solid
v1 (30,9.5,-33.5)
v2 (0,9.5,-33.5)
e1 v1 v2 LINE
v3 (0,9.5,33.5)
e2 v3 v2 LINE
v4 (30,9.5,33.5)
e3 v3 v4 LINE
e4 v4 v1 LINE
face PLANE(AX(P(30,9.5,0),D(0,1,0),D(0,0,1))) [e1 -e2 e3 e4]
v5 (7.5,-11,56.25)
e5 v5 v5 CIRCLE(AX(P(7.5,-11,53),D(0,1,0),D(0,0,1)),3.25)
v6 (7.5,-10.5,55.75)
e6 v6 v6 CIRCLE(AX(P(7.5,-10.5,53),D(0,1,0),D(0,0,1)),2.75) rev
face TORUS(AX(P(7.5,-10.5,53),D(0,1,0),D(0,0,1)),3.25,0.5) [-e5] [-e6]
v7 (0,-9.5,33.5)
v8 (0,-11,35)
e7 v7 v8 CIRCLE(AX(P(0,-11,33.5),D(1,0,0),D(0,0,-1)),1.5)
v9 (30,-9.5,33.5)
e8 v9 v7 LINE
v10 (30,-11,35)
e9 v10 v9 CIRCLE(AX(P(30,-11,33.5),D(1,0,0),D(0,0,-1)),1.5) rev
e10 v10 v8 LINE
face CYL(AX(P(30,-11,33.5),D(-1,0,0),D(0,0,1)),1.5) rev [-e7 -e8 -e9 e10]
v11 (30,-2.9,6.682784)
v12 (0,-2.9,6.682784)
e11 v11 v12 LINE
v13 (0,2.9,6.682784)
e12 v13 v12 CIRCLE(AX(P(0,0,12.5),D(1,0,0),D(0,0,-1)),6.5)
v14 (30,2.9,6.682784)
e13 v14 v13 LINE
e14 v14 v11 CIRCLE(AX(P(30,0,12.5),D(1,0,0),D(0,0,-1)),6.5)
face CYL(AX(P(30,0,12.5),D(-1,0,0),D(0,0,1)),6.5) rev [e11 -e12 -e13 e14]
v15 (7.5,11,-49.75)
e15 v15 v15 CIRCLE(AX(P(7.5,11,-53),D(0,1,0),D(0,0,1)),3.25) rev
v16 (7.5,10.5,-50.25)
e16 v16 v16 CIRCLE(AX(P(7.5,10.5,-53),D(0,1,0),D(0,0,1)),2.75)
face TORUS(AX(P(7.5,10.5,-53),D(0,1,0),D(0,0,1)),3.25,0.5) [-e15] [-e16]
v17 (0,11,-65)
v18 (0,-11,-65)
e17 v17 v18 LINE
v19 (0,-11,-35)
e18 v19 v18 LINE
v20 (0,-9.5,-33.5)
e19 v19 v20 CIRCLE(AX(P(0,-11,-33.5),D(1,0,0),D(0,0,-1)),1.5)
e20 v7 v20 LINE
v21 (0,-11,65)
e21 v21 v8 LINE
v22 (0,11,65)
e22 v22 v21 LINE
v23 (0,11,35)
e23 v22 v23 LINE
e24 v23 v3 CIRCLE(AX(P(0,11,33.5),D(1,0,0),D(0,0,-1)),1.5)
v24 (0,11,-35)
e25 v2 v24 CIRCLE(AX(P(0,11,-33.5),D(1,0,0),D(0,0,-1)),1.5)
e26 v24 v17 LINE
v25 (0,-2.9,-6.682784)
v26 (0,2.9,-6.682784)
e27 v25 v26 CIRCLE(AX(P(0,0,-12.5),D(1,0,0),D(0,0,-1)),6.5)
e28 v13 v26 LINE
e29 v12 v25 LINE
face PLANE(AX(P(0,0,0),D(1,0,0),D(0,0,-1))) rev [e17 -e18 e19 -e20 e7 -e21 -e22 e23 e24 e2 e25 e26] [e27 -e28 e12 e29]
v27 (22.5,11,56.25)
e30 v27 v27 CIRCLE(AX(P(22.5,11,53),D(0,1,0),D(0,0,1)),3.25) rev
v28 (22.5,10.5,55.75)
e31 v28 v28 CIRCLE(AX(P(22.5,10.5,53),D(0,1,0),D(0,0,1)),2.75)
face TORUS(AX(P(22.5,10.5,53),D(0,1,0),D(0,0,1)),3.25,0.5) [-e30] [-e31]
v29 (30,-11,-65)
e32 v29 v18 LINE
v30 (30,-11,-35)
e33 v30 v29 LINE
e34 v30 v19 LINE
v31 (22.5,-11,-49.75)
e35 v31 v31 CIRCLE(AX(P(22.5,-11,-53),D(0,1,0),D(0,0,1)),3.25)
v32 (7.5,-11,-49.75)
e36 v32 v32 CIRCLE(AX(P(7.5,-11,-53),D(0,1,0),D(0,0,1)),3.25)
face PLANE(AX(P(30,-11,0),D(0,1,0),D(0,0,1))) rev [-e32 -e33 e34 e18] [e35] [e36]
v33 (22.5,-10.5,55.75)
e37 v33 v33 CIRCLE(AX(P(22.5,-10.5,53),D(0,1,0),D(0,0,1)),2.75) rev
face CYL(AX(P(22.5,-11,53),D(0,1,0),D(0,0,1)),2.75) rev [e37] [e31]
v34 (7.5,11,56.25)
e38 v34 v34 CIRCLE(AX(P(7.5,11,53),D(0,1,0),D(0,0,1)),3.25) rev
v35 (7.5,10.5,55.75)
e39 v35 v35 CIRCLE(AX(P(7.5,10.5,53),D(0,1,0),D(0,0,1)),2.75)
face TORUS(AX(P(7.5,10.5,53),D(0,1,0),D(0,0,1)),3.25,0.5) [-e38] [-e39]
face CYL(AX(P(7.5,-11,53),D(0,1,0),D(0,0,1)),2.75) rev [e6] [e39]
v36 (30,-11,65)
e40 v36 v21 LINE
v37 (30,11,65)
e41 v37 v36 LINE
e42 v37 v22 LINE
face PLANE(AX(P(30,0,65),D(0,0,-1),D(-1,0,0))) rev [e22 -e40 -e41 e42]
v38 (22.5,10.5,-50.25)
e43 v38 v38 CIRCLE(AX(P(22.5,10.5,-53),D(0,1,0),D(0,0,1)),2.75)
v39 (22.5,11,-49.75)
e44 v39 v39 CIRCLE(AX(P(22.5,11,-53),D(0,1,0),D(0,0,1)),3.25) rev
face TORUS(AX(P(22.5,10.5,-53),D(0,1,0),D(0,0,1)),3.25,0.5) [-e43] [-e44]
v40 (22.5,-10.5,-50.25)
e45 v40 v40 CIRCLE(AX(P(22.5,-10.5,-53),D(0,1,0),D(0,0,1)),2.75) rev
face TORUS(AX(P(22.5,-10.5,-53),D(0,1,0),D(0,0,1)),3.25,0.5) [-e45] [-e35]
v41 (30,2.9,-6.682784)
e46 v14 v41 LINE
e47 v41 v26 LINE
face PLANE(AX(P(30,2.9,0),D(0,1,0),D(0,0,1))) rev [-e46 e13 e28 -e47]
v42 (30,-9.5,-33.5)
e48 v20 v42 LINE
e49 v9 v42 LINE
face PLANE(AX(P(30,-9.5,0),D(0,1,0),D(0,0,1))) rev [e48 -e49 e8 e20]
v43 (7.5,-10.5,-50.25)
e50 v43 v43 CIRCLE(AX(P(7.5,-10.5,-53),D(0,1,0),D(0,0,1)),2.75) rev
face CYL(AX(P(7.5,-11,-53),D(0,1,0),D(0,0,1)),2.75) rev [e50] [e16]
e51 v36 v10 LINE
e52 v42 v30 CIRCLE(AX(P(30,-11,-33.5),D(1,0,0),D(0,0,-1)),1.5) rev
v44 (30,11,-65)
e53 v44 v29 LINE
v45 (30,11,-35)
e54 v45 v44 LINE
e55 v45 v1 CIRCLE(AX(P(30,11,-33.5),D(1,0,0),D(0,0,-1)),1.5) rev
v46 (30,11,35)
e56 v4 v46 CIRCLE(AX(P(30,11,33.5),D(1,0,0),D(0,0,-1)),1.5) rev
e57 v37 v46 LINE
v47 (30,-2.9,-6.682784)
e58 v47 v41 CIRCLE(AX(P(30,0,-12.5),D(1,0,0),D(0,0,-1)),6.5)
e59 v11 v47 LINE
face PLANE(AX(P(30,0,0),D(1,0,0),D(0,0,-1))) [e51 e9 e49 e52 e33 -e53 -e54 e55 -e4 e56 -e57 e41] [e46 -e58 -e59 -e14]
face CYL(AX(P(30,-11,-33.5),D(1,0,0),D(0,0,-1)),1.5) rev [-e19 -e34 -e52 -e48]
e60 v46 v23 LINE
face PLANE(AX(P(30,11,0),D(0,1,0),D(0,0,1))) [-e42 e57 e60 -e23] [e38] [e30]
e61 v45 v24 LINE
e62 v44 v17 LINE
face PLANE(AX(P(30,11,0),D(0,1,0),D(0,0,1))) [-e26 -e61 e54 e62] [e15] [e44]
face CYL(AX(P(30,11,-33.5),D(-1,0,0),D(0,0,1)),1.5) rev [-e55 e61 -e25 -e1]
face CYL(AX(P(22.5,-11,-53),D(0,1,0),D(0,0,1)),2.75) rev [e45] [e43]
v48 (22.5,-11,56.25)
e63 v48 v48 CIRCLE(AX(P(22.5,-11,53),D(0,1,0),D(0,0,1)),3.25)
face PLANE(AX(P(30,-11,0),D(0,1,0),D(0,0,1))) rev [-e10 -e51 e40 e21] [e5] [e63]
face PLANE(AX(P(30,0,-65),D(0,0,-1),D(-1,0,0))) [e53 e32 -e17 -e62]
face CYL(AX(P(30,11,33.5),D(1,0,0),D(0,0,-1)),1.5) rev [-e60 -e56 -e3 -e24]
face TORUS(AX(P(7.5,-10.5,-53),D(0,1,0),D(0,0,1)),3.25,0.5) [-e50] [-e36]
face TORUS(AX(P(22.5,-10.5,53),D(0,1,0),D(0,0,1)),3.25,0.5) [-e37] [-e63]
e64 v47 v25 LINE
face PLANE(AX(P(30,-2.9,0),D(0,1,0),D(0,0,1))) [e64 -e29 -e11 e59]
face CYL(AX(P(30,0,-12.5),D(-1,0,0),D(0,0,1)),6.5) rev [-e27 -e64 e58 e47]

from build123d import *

# Parameters (mm, degrees)
BOSS_EXTRUDE1_DEPTH     = 30
FILLET1_R               = 1.5
SKETCH2_R               = 2.75
CUT_EXTRUDE1_DEPTH      = 75.893257373
MIRROR2_COPY_1_SKETCH_R = 2.75
MIRROR2_COPY_1_DEPTH    = 75.893257373
FILLET2_R               = 0.5


with BuildPart() as part:
    # Sketch1 → Boss-Extrude1 (new body)
    with BuildSketch(Plane(origin=(0, 0, 0), x_dir=(0, 0, -1), z_dir=(1, 0, 0))):
        Polygon((-35, 11), (-65, 11), (-65, -11), (-35, -11), (-35, -9.5), (35, -9.5), (35, -11), (65, -11), (65, 11), (35, 11), (35, 9.5), (-35, 9.5), align=None)
        with BuildLine():
            Line((-6.682784171, 2.9), (6.682784171, 2.9))
            ThreePointArc((6.682784171, 2.9), (19, 0), (6.682784171, -2.9))
            Line((6.682784171, -2.9), (-6.682784171, -2.9))
            ThreePointArc((-6.682784171, -2.9), (-19, 0), (-6.682784171, 2.9))
        make_face(mode=Mode.SUBTRACT)
    extrude(amount=BOSS_EXTRUDE1_DEPTH)

    # Fillet1
    fillet1_edges = [part.edges().sort_by_distance(p)[0] for p in [
        (15, -9.5, 35),
        (15, -9.5, -35),
        (15, 9.5, -35),
        (15, 9.5, 35),
    ]]
    fillet(fillet1_edges, radius=FILLET1_R - 0.0001)  # a hair under: the kernel refuses the full size

    # Sketch2 → Cut-Extrude1 (cut, through all)
    with BuildSketch(Plane(origin=(0, 11, 0), x_dir=(1, 0, 0), z_dir=(0, 1, 0))):
        with Locations(Location((7.5, 53, 0), (0, 0, 270))):
            Circle(SKETCH2_R)
    cut_extrude1 = extrude(amount=-CUT_EXTRUDE1_DEPTH, mode=Mode.SUBTRACT)

    # Mirror1: Cut-Extrude1 across plane
    add(cut_extrude1.mirror(Plane(origin=(15, 0, 0), x_dir=(0, 0, 1), z_dir=(1, 0, 0))), mode=Mode.SUBTRACT)

    # Mirror2: Cut-Extrude1 across plane
    add(cut_extrude1.mirror(Plane.XY), mode=Mode.SUBTRACT)

    # Mirror2 copy 1 sketch → Mirror2 copy 1 (cut, through all)
    with BuildSketch(Plane(origin=(30, 11, 0), x_dir=(-1, 0, 0), z_dir=(0, 1, 0))):
        with Locations(Location((7.5, 53, 0), (0, 0, 270))):
            Circle(MIRROR2_COPY_1_SKETCH_R)
    extrude(amount=-MIRROR2_COPY_1_DEPTH, mode=Mode.SUBTRACT)

    # Fillet2
    fillet2_edges = [part.edges().sort_by_distance(p)[0] for p in [
        (7.5, -11, -55.75),
        (7.5, 11, -55.75),
        (22.5, 11, -55.75),
        (22.5, -11, -55.75),
        (7.5, 11, 55.75),
        (7.5, -11, 55.75),
        (22.5, -11, 55.75),
        (22.5, 11, 55.75),
    ]]
    fillet(fillet2_edges, radius=FILLET2_R)


solid = part.part
